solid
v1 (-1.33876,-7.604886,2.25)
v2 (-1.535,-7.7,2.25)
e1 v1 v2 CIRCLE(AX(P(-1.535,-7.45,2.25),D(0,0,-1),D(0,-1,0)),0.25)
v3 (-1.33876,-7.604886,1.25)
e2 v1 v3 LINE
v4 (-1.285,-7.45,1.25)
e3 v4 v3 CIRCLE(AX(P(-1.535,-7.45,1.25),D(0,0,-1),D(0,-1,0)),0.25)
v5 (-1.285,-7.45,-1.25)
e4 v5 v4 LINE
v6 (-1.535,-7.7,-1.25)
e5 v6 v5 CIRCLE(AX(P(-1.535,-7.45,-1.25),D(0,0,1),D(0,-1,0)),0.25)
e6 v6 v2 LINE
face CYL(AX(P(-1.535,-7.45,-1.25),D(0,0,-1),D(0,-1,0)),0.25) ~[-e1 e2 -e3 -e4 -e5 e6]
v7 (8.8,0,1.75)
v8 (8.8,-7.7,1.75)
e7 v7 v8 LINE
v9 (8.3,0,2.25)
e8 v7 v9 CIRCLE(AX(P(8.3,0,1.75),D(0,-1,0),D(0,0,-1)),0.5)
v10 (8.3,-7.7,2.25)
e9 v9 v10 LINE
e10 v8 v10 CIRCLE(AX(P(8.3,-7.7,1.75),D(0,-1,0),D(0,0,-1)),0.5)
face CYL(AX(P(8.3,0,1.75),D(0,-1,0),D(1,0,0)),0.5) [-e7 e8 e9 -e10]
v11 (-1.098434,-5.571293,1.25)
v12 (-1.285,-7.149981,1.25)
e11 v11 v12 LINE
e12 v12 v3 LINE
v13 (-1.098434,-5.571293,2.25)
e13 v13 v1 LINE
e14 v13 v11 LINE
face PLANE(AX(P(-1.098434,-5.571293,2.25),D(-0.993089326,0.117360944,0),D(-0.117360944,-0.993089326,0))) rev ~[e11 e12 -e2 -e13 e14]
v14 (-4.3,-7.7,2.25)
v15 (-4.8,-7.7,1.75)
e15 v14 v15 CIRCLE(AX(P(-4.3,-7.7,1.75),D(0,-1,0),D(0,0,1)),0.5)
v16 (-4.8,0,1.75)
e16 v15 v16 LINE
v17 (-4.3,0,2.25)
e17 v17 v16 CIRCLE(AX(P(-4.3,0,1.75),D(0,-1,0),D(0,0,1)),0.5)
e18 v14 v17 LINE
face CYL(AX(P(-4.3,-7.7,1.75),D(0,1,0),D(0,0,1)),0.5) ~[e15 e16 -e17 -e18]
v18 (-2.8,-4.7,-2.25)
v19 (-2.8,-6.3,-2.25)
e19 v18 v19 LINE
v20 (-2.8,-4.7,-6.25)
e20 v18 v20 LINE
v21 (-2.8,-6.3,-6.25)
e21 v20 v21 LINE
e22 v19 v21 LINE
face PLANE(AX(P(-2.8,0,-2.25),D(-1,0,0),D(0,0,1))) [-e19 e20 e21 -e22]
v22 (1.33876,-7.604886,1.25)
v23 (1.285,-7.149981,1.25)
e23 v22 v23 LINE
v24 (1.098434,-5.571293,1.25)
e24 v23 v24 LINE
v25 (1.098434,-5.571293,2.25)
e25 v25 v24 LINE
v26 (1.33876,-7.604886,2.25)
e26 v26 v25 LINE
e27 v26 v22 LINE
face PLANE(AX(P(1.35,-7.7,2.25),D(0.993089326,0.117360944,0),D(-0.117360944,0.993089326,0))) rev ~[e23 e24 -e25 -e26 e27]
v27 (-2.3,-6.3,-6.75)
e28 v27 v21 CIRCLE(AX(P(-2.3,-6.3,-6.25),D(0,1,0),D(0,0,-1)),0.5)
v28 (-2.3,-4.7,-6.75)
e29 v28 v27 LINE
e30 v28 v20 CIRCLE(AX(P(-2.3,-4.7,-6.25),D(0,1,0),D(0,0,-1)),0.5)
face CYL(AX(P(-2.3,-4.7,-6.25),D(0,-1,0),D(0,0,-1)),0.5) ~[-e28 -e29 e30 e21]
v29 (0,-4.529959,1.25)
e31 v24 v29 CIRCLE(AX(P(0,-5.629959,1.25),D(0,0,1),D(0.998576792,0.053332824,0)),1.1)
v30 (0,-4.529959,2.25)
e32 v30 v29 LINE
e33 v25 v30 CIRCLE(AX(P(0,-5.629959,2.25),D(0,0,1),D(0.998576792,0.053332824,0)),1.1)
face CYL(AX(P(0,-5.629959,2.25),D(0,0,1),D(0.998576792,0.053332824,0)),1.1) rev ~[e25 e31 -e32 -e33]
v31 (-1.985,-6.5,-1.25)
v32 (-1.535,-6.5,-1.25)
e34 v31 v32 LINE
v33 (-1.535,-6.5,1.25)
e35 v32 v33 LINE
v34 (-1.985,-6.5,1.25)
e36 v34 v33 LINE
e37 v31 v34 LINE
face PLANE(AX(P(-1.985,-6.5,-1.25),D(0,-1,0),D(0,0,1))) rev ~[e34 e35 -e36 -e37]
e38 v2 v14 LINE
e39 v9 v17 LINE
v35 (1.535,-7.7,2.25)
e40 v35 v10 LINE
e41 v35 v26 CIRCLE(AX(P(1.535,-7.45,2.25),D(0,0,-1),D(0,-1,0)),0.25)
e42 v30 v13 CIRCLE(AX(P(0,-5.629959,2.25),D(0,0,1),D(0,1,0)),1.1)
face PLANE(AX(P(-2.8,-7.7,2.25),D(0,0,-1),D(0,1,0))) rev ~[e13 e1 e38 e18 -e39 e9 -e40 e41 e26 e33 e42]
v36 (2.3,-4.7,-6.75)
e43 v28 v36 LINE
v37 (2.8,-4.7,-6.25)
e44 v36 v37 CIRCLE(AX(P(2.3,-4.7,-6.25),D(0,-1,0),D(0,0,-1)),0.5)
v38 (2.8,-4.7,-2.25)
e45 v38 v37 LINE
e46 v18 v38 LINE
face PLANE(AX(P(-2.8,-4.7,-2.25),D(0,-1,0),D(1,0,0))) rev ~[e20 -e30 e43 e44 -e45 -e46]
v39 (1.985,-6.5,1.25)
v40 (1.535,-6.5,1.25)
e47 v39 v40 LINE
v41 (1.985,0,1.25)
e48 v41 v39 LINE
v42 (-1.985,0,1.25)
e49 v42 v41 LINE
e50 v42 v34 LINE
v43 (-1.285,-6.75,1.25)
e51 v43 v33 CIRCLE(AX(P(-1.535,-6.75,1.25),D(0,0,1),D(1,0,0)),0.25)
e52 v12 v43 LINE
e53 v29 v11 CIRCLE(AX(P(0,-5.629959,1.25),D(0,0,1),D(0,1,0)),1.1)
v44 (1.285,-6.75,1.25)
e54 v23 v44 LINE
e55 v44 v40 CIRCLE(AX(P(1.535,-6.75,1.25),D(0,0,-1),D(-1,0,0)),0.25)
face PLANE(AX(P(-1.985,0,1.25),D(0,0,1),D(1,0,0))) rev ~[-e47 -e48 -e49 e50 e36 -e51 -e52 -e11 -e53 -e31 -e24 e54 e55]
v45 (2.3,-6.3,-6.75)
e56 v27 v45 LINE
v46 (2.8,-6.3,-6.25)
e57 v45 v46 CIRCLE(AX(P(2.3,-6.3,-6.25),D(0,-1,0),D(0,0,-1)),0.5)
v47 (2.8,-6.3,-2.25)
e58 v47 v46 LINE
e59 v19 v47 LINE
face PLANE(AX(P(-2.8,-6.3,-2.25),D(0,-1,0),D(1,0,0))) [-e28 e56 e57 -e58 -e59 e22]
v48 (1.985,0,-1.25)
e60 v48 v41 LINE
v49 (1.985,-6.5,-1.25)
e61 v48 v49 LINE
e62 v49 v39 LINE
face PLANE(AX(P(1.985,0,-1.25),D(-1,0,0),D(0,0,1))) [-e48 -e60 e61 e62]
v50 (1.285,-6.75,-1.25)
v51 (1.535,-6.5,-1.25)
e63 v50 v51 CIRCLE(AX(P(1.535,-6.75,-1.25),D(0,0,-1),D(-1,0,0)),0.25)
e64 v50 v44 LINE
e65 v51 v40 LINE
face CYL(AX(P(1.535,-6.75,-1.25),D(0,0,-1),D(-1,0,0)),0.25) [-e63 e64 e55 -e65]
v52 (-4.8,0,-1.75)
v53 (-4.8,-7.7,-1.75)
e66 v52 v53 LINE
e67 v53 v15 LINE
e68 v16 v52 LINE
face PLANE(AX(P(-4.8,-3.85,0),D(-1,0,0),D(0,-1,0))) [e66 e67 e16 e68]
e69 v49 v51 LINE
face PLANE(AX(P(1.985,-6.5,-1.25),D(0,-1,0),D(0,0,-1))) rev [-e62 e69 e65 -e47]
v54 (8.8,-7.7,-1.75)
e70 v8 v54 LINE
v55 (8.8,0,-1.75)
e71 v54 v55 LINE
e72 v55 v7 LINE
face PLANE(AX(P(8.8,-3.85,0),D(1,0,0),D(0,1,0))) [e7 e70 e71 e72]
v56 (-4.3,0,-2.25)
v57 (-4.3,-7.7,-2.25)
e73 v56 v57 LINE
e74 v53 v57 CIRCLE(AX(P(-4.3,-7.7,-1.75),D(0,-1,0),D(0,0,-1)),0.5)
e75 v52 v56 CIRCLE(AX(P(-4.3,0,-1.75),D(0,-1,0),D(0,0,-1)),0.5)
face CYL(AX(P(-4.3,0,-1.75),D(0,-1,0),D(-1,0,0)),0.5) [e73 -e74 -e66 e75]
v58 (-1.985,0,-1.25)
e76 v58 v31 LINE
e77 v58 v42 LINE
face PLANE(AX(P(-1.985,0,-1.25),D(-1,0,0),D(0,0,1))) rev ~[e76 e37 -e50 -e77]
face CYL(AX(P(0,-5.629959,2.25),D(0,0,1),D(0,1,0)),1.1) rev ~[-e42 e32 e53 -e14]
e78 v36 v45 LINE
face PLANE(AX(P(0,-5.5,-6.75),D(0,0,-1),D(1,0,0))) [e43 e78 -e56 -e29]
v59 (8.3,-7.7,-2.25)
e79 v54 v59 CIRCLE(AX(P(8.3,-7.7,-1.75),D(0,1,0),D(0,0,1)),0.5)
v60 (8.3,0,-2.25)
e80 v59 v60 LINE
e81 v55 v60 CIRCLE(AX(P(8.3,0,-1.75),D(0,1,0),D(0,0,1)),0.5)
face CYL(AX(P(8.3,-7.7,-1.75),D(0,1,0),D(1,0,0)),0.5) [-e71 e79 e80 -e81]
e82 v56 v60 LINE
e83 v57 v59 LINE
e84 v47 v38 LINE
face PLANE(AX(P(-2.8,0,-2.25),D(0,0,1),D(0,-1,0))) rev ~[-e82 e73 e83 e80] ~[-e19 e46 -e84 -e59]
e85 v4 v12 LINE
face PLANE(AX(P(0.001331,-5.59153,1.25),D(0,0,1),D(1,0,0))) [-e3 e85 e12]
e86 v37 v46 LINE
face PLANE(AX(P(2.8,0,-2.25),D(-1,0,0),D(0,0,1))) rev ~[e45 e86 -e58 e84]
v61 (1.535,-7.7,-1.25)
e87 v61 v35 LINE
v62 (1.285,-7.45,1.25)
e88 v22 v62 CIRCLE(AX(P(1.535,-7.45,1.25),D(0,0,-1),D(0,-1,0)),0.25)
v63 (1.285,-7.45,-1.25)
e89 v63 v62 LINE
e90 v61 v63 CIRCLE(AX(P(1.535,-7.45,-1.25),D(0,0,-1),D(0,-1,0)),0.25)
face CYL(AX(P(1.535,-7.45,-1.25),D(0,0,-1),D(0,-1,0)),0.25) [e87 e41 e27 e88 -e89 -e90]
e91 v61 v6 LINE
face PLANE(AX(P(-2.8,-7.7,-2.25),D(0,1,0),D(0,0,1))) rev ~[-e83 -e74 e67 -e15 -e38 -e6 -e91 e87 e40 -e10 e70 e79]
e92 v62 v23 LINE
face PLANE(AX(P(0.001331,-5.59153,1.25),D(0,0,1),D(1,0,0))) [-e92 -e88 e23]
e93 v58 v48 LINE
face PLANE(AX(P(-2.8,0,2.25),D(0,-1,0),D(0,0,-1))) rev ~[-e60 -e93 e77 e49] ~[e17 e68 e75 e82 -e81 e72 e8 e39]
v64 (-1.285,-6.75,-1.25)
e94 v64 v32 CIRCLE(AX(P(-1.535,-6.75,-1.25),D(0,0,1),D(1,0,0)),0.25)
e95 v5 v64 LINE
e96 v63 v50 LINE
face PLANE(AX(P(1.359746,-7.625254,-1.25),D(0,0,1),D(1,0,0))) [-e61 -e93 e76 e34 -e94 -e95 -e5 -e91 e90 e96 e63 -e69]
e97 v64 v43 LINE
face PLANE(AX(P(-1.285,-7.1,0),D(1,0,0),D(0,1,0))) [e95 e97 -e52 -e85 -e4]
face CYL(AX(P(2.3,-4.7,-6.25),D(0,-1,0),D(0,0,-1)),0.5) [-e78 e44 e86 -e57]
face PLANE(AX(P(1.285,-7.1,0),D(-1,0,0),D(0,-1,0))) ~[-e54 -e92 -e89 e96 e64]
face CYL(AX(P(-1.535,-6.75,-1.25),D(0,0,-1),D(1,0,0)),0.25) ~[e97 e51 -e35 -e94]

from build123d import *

# Parameters (mm, degrees)
F0_W         = 5.6
F0_H         = 4.5
F0_W_2       = 3.97
F0_H_2       = 2.5
F1_DEPTH     = 7.7
F2_W         = 5.6
F2_H         = 1.6
F3_DEPTH     = 4.5
F4_W         = 1.2
F4_H         = 2.5
F5_DEPTH     = 0.7
F8_DEPTH     = 6
F10_DEPTH    = 1
F12_DEPTH    = 2
F13_R        = 0.5
F14_T1_DEPTH = 4
F14_T3_DEPTH = 2.5


# Not quite as in the source:
# - a fillet or chamfer that OpenCascade refuses, or shapes differently, is made with other operations: its cross-section is extruded or revolved along the edge and cut away or added
# - a pattern or mirror of a feature is missing from the dataset's text; its kind, count and spacing are read off the source's solid


with BuildPart() as f1:
    # F0 (on Front) → F1 (new body)
    with BuildSketch(Plane.XZ):
        Rectangle(F0_W, F0_H)
        Rectangle(F0_W_2, F0_H_2, mode=Mode.SUBTRACT)
    extrude(amount=F1_DEPTH)

    # F2 (on face) → F3 (join)
    with BuildSketch(Plane(origin=(0, 0, -2.25), x_dir=(1, 0, 0), z_dir=(0, 0, -1))):
        with Locations((0, 5.5)):
            Rectangle(F2_W, F2_H)
    extrude(amount=F3_DEPTH)

    # F4 (on face) → F5 (join)
    with BuildSketch(Plane.YZ.offset(-1.985)):
        with Locations((-7.1, 0)):
            Rectangle(F4_W, F4_H)
    f5 = extrude(amount=F5_DEPTH)

    # F5_copies: F5 across plane
    add(f5.mirror(Plane(origin=(0, 0, 0), x_dir=(0, 0, 1), z_dir=(1, 0, 0))))

    # F7 (on face) → F8 (join)
    with BuildSketch(Plane.YZ.offset(2.8)):
        Polygon((0, 2.25), (-7.7, 2.25), (-7.7, -2.25), (-6.3, -2.25), (-4.7, -2.25), (0, -2.25), align=None)
    extrude(amount=F8_DEPTH)

    # F9 (on face) → F10 (cut)
    with BuildSketch(Plane.XY.offset(2.25)):
        with BuildLine():
            ThreePointArc((-1.0984344714, -5.5712931935), (-0.0293434956, -6.7295678482), (1.1, -5.6299593))
            ThreePointArc((1.1, -5.6299593), (1.0996085482, -5.6006158044), (1.0984344714, -5.5712931935))
            ThreePointArc((1.0984344714, -5.5712931935), (0.7567916764, -4.8316696542), (0, -4.5299593))
            ThreePointArc((0, -4.5299593), (-0.7567916764, -4.8316696542), (-1.0984344714, -5.5712931935))
        make_face()
        with BuildLine():
            ThreePointArc((1.0984344714, -5.5712931935), (1.0996085482, -5.6006158044), (1.1, -5.6299593))
            ThreePointArc((1.1, -5.6299593), (-0.0293434956, -6.7295678482), (-1.0984344714, -5.5712931935))
            Line((-1.0984344714, -5.5712931935), (-1.35, -7.7))
            Line((-1.35, -7.7), (1.35, -7.7))
            Line((1.35, -7.7), (1.0984344714, -5.5712931935))
        make_face()
    extrude(amount=-F10_DEPTH, mode=Mode.SUBTRACT)

    # F11 (on face) → F12 (join)
    with BuildSketch(Plane(origin=(-2.8, 0, 0), x_dir=(0, -1, 0), z_dir=(-1, 0, 0))):
        Polygon((7.7, -2.25), (7.7, 2.25), (0, 2.25), (0, -2.25), (4.7, -2.25), (6.3, -2.25), align=None)
    extrude(amount=F12_DEPTH)

    # F13
    f13_edges = [f1.edges().sort_by_distance(p)[0] for p in [
        (8.8, -3.85, -2.25),
        (8.8, -3.85, 2.25),
        (2.8, -5.5, -6.75),
        (-4.8, -3.85, 2.25),
        (-4.8, -3.85, -2.25),
        (-2.8, -5.5, -6.75),
    ]]
    fillet(f13_edges, radius=F13_R)

    # F14: fillet of radius 0.25 on 4 edges, made by hand

    # F14_s2 → F14_t1 (cut)
    with BuildSketch(Plane.XY.offset(-1.25)):
        with BuildLine():
            ThreePointArc((-1.535, -7.7), (-1.3582233047, -7.6267766953), (-1.285, -7.45))
            Line((-1.285, -7.45), (-1.28, -7.45))
            Line((-1.28, -7.45), (-1.28, -7.705))
            Line((-1.28, -7.705), (-1.535, -7.705))
            Line((-1.535, -7.705), (-1.535, -7.7))
        make_face()
        with BuildLine():
            ThreePointArc((1.535, -7.7), (1.3582233047, -7.6267766953), (1.285, -7.45))
            Line((1.285, -7.45), (1.28, -7.45))
            Line((1.28, -7.45), (1.28, -7.705))
            Line((1.28, -7.705), (1.535, -7.705))
            Line((1.535, -7.705), (1.535, -7.7))
        make_face()
    extrude(amount=F14_T1_DEPTH, mode=Mode.SUBTRACT)

    # F14_s4 → F14_t3 (cut)
    with BuildSketch(Plane.XY.offset(-1.25)):
        with BuildLine():
            ThreePointArc((-1.285, -6.75), (-1.3582233047, -6.5732233047), (-1.535, -6.5))
            Line((-1.535, -6.5), (-1.535, -6.495))
            Line((-1.535, -6.495), (-1.28, -6.495))
            Line((-1.28, -6.495), (-1.28, -6.75))
            Line((-1.28, -6.75), (-1.285, -6.75))
        make_face()
        with BuildLine():
            ThreePointArc((1.285, -6.75), (1.3582233047, -6.5732233047), (1.535, -6.5))
            Line((1.535, -6.5), (1.535, -6.495))
            Line((1.535, -6.495), (1.28, -6.495))
            Line((1.28, -6.495), (1.28, -6.75))
            Line((1.28, -6.75), (1.285, -6.75))
        make_face()
    extrude(amount=F14_T3_DEPTH, mode=Mode.SUBTRACT)


solid = f1.part
